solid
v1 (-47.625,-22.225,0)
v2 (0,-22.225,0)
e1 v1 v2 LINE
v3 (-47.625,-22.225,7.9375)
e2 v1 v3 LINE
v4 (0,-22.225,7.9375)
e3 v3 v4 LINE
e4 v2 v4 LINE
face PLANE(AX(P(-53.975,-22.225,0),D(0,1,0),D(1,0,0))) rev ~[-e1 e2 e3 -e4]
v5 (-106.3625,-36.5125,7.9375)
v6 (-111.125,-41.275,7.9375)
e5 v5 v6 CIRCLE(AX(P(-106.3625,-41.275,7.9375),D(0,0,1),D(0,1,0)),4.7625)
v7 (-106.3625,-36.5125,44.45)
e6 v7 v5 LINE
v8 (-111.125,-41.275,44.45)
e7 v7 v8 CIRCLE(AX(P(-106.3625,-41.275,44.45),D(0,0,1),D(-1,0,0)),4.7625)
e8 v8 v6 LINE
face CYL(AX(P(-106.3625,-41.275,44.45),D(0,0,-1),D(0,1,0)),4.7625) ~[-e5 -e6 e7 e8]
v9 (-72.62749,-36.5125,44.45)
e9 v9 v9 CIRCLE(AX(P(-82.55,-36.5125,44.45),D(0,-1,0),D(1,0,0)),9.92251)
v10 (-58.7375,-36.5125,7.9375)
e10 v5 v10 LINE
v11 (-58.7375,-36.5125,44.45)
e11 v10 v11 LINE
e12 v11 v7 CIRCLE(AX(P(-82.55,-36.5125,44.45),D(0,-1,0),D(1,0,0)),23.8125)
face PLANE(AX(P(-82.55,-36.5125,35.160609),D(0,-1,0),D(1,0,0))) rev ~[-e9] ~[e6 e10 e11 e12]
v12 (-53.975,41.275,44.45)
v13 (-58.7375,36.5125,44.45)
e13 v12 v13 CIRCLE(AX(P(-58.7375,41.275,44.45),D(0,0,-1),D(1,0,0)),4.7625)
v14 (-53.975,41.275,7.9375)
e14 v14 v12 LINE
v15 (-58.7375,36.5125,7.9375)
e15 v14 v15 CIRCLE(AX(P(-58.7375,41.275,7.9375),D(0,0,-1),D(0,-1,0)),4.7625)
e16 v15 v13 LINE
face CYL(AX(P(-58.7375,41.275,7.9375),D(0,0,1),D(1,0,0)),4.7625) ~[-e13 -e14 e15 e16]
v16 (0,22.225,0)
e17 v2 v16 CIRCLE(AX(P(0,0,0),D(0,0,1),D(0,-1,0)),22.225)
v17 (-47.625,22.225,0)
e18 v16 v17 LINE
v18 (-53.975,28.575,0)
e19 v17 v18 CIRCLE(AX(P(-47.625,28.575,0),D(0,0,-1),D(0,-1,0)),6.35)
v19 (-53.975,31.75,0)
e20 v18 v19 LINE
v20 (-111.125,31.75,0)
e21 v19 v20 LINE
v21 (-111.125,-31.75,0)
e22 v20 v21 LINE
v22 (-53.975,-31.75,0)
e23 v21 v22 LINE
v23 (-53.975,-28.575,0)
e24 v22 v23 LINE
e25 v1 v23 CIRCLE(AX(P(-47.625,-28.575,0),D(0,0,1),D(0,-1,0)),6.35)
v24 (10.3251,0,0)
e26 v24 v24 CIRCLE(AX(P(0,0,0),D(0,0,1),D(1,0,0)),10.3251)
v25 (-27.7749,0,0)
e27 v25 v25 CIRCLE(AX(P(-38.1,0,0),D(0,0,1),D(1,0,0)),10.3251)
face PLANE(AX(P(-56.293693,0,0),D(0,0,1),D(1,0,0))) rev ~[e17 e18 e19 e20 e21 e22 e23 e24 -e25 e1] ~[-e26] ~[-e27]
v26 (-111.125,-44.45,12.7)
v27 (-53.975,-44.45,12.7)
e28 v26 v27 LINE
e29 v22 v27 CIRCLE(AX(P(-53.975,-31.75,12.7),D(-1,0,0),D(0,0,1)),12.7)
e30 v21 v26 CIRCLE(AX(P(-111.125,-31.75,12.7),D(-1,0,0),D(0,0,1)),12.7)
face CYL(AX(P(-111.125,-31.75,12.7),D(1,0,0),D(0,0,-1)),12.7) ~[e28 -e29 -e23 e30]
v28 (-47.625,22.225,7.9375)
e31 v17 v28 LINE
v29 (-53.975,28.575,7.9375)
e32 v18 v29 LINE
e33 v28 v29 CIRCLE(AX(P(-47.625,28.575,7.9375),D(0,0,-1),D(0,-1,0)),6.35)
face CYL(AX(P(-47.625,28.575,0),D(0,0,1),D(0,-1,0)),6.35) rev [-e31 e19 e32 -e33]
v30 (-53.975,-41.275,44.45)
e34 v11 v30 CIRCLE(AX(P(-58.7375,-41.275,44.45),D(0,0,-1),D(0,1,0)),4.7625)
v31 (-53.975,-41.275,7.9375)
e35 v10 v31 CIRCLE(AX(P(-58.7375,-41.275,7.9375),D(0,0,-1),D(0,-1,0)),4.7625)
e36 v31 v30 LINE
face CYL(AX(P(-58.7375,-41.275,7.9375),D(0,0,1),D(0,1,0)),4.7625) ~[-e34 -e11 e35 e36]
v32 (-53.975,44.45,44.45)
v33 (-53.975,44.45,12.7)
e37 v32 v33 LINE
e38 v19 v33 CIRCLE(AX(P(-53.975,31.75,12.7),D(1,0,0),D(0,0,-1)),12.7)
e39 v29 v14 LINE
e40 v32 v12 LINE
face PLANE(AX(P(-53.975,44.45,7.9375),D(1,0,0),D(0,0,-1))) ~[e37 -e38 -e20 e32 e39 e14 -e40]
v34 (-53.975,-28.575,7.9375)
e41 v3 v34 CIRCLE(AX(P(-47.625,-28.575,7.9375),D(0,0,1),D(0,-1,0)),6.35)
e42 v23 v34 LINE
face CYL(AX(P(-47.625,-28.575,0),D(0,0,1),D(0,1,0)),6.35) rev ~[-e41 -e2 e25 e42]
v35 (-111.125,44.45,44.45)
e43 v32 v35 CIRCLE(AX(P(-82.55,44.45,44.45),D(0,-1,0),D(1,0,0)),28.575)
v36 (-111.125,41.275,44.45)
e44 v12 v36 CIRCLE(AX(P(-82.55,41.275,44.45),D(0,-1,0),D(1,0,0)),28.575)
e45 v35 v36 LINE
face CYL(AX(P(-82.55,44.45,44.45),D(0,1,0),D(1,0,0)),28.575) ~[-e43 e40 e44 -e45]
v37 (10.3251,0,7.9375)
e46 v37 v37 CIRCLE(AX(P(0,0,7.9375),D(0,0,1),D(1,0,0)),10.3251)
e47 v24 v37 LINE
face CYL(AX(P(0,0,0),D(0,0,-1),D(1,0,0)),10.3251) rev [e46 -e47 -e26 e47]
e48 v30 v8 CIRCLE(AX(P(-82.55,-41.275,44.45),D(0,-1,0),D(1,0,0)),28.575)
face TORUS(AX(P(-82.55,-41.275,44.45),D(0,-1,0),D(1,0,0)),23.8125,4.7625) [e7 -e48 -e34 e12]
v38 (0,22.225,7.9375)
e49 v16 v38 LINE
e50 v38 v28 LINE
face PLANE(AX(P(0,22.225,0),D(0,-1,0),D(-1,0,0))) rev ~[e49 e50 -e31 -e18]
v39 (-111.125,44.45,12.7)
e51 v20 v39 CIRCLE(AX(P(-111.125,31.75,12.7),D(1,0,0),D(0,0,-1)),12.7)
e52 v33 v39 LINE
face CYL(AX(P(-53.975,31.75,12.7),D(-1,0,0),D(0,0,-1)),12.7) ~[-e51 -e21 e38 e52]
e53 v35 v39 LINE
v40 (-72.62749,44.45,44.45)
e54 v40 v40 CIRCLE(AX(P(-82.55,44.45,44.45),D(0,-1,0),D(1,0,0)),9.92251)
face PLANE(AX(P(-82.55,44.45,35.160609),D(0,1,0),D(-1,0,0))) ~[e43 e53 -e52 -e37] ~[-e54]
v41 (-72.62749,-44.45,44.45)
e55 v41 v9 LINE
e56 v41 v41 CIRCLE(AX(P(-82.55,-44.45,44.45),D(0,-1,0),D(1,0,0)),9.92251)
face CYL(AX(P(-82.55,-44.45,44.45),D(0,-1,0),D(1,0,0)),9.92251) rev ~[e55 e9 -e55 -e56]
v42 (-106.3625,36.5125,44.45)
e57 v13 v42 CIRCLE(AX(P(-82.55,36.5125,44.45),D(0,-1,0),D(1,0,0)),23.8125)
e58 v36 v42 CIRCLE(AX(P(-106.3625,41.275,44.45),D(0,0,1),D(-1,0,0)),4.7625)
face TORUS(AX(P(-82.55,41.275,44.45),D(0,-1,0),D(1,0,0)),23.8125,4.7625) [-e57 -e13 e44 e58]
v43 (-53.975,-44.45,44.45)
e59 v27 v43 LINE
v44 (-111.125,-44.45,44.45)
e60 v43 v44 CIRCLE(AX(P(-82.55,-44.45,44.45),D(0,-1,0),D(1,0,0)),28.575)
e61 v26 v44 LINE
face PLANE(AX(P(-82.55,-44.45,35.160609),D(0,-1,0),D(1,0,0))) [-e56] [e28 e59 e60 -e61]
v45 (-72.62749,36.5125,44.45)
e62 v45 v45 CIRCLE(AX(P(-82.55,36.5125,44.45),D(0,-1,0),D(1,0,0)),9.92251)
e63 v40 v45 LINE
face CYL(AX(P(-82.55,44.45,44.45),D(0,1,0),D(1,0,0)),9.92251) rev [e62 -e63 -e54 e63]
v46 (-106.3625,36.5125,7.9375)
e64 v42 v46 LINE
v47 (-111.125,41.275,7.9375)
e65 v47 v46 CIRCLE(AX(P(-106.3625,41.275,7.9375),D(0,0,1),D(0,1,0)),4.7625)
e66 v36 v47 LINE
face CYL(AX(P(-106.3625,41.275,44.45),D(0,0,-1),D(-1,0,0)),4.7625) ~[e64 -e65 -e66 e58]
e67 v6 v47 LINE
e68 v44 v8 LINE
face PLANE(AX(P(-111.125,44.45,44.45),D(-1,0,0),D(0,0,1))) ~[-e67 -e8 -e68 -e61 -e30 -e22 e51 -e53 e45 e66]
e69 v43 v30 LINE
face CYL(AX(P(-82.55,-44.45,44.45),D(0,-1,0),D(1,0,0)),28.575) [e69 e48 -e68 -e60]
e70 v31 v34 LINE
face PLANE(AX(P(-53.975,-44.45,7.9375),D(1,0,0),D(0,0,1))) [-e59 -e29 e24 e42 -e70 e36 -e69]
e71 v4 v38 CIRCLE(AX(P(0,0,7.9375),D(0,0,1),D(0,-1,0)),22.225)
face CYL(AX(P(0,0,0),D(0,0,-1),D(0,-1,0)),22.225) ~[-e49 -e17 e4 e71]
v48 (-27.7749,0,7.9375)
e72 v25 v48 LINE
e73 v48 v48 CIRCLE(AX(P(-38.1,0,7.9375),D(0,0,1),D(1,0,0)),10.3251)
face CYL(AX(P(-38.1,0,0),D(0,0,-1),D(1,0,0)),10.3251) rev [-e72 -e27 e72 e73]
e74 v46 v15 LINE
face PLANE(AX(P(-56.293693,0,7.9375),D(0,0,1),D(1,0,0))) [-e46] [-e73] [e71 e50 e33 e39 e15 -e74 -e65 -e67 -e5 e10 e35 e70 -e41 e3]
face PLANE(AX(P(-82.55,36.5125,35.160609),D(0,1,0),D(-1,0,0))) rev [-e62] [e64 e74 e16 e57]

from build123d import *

# Parameters (mm, degrees)
F0_R     = 10.3251
F1_DEPTH = 7.9375
F2_R     = 6.35
F3_R     = 9.92251
F4_DEPTH = 7.9375
F6_R     = 12.7
F7_R     = 4.7625


with BuildPart() as f1:
    # F0 (on Top) → F1 (new body)
    with BuildSketch(Plane.XY):
        with BuildLine():
            Line((-53.975, -22.225), (0, -22.225))
            ThreePointArc((0, -22.225), (22.225, 0), (0, 22.225))
            Line((0, 22.225), (-53.975, 22.225))
            Line((-53.975, 22.225), (-53.975, 44.45))
            Line((-53.975, 44.45), (-111.125, 44.45))
            Line((-111.125, 44.45), (-111.125, -44.45))
            Line((-111.125, -44.45), (-53.975, -44.45))
            Line((-53.975, -44.45), (-53.975, -22.225))
        make_face()
        with Locations((-38.1, 0)):
            Circle(F0_R, mode=Mode.SUBTRACT)
        Circle(F0_R, mode=Mode.SUBTRACT)
    extrude(amount=F1_DEPTH)

    # F2
    f2_edges = [f1.edges().sort_by_distance(p)[0] for p in [
        (-53.975, -22.225, 3.96875),
        (-53.975, 22.225, 3.96875),
    ]]
    fillet(f2_edges, radius=F2_R)

    # F3 (on face) → F4 (join)
    with BuildSketch(Plane.XZ.offset(44.45)):
        with BuildLine():
            Line((-111.125, 44.45), (-111.125, 7.9375))
            Line((-111.125, 7.9375), (-53.975, 7.9375))
            Line((-53.975, 7.9375), (-53.975, 44.45))
            ThreePointArc((-53.975, 44.45), (-82.55, 73.025), (-111.125, 44.45))
        make_face()
        with Locations((-82.55, 44.45)):
            Circle(F3_R, mode=Mode.SUBTRACT)
    extrude(amount=-F4_DEPTH)

    # F5: F1 across plane


with BuildPart() as f1_1:
    add(f1.part)
    add(f1.part.mirror(Plane.XZ))

    # F6
    f6_edges = [f1_1.edges().sort_by_distance(p)[0] for p in [
        (-82.55, 44.45, 0),
        (-82.55, -44.45, 0),
    ]]
    fillet(f6_edges, radius=F6_R)

    # F7
    f7_edges = [f1_1.edges().sort_by_distance(p)[0] for p in [
        (-82.55, 36.5125, 73.025),
        (-82.55, -36.5125, 73.025),
    ]]
    fillet(f7_edges, radius=F7_R)


solid = f1_1.part
